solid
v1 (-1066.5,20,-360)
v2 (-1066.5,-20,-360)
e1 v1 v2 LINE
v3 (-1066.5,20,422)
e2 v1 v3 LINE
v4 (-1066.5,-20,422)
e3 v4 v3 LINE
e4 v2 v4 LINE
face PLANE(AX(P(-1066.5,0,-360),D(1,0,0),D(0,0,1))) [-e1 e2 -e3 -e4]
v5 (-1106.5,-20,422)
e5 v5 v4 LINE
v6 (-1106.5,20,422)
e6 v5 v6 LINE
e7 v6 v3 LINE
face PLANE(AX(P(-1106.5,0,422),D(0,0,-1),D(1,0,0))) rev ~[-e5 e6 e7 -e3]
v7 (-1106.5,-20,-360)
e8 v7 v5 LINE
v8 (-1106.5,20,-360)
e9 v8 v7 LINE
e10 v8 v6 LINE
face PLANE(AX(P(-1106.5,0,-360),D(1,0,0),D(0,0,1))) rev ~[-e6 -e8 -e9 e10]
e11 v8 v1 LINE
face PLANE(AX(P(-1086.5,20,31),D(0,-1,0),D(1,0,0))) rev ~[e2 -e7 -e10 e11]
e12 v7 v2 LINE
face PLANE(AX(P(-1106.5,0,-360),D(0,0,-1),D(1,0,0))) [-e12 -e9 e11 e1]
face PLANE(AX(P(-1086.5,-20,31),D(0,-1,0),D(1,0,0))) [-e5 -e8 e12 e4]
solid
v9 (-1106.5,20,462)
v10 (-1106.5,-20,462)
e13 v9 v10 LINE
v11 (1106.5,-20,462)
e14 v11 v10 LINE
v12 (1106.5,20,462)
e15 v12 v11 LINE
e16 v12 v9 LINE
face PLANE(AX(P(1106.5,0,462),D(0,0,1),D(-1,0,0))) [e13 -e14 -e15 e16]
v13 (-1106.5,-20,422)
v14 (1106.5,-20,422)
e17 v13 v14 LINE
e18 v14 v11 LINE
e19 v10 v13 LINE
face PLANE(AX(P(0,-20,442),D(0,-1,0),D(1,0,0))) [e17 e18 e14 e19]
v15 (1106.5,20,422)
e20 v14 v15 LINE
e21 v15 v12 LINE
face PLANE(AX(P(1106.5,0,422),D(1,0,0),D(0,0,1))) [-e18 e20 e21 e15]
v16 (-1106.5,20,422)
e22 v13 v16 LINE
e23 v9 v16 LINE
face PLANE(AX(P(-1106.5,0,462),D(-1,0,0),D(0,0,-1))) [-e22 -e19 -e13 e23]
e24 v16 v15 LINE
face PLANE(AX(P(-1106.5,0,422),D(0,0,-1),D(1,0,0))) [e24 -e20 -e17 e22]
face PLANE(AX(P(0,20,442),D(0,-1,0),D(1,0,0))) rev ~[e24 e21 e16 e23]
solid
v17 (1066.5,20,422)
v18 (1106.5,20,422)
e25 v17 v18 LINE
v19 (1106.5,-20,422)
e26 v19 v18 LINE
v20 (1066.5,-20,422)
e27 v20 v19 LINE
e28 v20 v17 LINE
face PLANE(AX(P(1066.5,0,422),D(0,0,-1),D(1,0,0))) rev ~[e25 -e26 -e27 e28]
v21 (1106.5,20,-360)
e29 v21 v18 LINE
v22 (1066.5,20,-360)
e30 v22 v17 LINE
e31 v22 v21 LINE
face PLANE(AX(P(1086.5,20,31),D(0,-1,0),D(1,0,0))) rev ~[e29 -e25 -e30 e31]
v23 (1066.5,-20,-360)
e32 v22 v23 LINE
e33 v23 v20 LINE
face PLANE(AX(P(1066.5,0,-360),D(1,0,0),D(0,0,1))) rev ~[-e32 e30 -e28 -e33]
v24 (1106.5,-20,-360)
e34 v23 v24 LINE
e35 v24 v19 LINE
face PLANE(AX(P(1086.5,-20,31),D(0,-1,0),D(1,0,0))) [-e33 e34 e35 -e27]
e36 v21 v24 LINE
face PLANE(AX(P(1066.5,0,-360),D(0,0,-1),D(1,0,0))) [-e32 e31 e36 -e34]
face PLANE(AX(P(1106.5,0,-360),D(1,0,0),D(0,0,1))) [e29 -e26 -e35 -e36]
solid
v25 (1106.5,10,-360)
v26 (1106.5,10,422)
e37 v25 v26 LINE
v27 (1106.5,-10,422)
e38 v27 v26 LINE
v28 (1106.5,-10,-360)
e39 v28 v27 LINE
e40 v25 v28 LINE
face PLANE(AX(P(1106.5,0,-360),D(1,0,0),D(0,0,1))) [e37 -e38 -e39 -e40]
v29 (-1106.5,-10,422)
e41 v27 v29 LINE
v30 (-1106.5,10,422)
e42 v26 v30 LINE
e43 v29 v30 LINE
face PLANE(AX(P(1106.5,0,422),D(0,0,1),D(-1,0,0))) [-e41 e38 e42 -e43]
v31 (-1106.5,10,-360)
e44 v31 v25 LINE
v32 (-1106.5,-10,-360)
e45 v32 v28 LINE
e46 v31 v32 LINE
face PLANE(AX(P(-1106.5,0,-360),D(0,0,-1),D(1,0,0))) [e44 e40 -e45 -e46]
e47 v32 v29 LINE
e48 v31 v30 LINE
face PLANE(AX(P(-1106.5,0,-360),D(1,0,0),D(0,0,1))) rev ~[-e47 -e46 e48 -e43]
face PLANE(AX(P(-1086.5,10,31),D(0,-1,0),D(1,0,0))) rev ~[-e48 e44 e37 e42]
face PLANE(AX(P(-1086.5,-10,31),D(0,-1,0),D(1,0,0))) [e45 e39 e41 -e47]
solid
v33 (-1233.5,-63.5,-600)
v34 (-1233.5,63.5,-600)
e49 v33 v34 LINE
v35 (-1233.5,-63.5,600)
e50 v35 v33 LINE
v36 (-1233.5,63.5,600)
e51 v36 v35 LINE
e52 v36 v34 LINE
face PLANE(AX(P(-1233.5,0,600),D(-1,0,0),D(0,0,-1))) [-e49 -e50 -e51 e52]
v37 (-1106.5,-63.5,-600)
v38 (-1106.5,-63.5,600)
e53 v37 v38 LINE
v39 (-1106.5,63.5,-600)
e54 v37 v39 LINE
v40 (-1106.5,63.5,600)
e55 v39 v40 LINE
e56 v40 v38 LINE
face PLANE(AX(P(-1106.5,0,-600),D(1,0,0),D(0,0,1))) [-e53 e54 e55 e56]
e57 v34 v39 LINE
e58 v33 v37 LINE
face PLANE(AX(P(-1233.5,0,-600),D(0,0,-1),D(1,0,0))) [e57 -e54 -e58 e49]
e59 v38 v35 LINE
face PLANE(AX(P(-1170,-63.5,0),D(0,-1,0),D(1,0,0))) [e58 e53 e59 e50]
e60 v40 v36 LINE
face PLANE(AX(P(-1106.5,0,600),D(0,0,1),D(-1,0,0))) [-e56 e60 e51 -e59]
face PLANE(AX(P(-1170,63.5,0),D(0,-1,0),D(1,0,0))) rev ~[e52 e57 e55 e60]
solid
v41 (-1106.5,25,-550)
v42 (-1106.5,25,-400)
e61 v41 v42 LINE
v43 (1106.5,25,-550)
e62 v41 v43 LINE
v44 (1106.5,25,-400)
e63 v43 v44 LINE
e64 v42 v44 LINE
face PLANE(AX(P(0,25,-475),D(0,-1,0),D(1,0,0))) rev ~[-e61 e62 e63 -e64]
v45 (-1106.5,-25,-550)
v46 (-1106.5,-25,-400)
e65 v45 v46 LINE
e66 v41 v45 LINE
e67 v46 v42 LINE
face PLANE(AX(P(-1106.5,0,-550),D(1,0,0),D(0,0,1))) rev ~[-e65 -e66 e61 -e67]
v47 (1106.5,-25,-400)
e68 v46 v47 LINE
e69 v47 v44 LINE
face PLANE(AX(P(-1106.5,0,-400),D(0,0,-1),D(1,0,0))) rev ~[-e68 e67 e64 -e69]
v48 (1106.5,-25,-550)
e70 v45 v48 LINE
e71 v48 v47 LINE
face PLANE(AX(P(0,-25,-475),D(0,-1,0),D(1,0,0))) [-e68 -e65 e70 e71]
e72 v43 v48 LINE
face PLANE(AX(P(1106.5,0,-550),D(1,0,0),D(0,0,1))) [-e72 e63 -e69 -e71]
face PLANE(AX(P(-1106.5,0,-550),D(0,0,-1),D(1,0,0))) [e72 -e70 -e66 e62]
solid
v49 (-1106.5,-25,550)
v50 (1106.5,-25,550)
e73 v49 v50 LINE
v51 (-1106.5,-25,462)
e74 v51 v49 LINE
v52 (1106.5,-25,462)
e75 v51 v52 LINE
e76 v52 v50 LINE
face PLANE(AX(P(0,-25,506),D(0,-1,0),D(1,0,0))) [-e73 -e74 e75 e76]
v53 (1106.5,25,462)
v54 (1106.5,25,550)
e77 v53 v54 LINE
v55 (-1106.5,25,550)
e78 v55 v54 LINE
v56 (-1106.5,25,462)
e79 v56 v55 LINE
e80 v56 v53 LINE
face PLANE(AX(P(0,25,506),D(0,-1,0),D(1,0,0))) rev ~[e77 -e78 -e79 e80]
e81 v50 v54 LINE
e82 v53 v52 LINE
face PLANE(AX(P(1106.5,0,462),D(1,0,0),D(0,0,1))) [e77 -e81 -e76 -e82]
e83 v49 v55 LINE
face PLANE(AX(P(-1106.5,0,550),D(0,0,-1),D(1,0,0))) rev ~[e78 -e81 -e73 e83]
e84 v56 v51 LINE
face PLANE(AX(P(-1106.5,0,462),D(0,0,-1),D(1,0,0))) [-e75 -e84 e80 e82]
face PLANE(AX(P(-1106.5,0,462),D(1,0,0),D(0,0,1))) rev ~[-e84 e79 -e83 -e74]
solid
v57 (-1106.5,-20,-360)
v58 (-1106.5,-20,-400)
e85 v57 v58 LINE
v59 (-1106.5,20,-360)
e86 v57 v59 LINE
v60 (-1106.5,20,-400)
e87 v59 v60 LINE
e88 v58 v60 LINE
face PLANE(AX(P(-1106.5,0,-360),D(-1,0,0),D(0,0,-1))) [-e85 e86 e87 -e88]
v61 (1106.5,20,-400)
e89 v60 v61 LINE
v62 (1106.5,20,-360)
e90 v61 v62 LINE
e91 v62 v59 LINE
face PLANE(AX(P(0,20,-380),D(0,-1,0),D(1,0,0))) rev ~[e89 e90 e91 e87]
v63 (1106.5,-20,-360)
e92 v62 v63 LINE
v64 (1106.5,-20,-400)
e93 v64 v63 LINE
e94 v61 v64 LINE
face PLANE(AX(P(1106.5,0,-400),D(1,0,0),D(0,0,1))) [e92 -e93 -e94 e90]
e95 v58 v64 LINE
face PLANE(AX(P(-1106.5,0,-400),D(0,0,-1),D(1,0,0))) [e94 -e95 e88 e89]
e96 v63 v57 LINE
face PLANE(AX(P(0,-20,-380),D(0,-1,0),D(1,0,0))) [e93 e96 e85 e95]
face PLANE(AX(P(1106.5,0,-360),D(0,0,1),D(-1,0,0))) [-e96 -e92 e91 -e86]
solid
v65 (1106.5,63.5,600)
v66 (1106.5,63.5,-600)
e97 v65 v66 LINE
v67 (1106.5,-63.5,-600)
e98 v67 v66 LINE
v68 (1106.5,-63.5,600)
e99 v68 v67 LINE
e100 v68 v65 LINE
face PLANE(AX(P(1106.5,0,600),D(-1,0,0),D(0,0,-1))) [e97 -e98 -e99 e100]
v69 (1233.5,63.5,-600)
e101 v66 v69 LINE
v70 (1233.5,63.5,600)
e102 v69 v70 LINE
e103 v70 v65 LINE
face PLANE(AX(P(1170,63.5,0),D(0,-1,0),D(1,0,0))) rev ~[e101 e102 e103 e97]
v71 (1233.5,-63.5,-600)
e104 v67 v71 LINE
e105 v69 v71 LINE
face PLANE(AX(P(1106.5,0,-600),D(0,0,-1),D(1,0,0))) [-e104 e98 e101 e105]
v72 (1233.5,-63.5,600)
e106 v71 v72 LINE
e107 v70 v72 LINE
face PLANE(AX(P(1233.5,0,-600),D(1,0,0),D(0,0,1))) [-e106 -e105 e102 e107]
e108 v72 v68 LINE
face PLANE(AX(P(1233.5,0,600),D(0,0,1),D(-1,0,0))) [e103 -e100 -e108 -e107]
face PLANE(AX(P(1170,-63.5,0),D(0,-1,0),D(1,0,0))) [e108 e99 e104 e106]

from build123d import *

# Parameters (mm, degrees)
F1_DEPTH      = 63.5
F1_DEPTH_BACK = 63.5
F0_W          = 2213
F0_H          = 150
F2_DEPTH      = 25
F2_DEPTH_BACK = 25
F0_H_2        = 88
F3_DEPTH      = 20
F3_DEPTH_BACK = 20
F0_W_2        = 40
F0_H_3        = 782
F0_W_3        = 2133
F4_DEPTH      = 10
F4_DEPTH_BACK = 10
F5_DEPTH      = 20
F5_DEPTH_BACK = 20


# Not quite as in the source:
# - a feature names something its author has since deleted; it is built from what else it names


with BuildPart() as f1:
    # F0 (on Front) → F1 (new body, two sides)
    with BuildSketch(Plane.XZ) as f1_sk:
        Polygon((-1106.5, -600), (-1106.5, -550), (-1106.5, -400), (-1106.5, -360), (-1106.5, 422), (-1106.5, 462), (-1106.5, 550), (-1106.5, 600), (-1233.5, 600), (-1233.5, -600), align=None)
    extrude(amount=F1_DEPTH)
    extrude(f1_sk.sketch, amount=-F1_DEPTH_BACK)


with BuildPart() as f1b:
    # F0 (on Front) → F1, piece 2 (new body, two sides)
    with BuildSketch(Plane.XZ) as f1_2_sk:
        Polygon((1106.5, -600), (1233.5, -600), (1233.5, 600), (1106.5, 600), (1106.5, 550), (1106.5, 462), (1106.5, 422), (1106.5, -360), (1106.5, -400), (1106.5, -550), align=None)
    extrude(amount=F1_DEPTH)
    extrude(f1_2_sk.sketch, amount=-F1_DEPTH_BACK)


with BuildPart() as f2:
    # F0 (on Front) → F2 (new body, two sides)
    with BuildSketch(Plane.XZ) as f2_sk:
        with Locations((0, -475)):
            Rectangle(F0_W, F0_H)
    extrude(amount=F2_DEPTH)
    extrude(f2_sk.sketch, amount=-F2_DEPTH_BACK)


with BuildPart() as f2b:
    # F0 (on Front) → F2, piece 2 (new body, two sides)
    with BuildSketch(Plane.XZ) as f2_2_sk:
        with Locations((0, 506)):
            Rectangle(F0_W, F0_H_2)
    extrude(amount=F2_DEPTH)
    extrude(f2_2_sk.sketch, amount=-F2_DEPTH_BACK)


with BuildPart() as f3:
    # F0 (on Front) → F3 (new body, two sides)
    with BuildSketch(Plane.XZ) as f3_sk:
        Polygon((1106.5, 422), (1106.5, 462), (-1106.5, 462), (-1106.5, 422), (-1066.5, 422), (1066.5, 422), align=None)
    extrude(amount=F3_DEPTH)
    extrude(f3_sk.sketch, amount=-F3_DEPTH_BACK)


with BuildPart() as f3b:
    # F0 (on Front) → F3, piece 2 (new body, two sides)
    with BuildSketch(Plane.XZ) as f3_2_sk:
        Polygon((-1106.5, -400), (1106.5, -400), (1106.5, -360), (1066.5, -360), (-1066.5, -360), (-1106.5, -360), align=None)
    extrude(amount=F3_DEPTH)
    extrude(f3_2_sk.sketch, amount=-F3_DEPTH_BACK)


with BuildPart() as f4:
    # F0 (on Front) → F4 (new body, two sides)
    with BuildSketch(Plane.XZ) as f4_sk:
        with Locations((-1086.5, 31)):
            Rectangle(F0_W_2, F0_H_3)
        with Locations((0, 31)):
            Rectangle(F0_W_3, F0_H_3)
        with Locations((1086.5, 31)):
            Rectangle(F0_W_2, F0_H_3)
    extrude(amount=F4_DEPTH)
    extrude(f4_sk.sketch, amount=-F4_DEPTH_BACK)


with BuildPart() as f5:
    # F0 (on Front) → F5 (new body, two sides)
    with BuildSketch(Plane.XZ) as f5_sk:
        with Locations((-1086.5, 31)):
            Rectangle(F0_W_2, F0_H_3)
    extrude(amount=F5_DEPTH)
    extrude(f5_sk.sketch, amount=-F5_DEPTH_BACK)


with BuildPart() as f5b:
    # F0 (on Front) → F5, piece 2 (new body, two sides)
    with BuildSketch(Plane.XZ) as f5_2_sk:
        with Locations((1086.5, 31)):
            Rectangle(F0_W_2, F0_H_3)
    extrude(amount=F5_DEPTH)
    extrude(f5_2_sk.sketch, amount=-F5_DEPTH_BACK)


solid = Compound([f1.part, f1b.part, f2.part, f2b.part, f3.part, f3b.part, f4.part, f5.part, f5b.part])
